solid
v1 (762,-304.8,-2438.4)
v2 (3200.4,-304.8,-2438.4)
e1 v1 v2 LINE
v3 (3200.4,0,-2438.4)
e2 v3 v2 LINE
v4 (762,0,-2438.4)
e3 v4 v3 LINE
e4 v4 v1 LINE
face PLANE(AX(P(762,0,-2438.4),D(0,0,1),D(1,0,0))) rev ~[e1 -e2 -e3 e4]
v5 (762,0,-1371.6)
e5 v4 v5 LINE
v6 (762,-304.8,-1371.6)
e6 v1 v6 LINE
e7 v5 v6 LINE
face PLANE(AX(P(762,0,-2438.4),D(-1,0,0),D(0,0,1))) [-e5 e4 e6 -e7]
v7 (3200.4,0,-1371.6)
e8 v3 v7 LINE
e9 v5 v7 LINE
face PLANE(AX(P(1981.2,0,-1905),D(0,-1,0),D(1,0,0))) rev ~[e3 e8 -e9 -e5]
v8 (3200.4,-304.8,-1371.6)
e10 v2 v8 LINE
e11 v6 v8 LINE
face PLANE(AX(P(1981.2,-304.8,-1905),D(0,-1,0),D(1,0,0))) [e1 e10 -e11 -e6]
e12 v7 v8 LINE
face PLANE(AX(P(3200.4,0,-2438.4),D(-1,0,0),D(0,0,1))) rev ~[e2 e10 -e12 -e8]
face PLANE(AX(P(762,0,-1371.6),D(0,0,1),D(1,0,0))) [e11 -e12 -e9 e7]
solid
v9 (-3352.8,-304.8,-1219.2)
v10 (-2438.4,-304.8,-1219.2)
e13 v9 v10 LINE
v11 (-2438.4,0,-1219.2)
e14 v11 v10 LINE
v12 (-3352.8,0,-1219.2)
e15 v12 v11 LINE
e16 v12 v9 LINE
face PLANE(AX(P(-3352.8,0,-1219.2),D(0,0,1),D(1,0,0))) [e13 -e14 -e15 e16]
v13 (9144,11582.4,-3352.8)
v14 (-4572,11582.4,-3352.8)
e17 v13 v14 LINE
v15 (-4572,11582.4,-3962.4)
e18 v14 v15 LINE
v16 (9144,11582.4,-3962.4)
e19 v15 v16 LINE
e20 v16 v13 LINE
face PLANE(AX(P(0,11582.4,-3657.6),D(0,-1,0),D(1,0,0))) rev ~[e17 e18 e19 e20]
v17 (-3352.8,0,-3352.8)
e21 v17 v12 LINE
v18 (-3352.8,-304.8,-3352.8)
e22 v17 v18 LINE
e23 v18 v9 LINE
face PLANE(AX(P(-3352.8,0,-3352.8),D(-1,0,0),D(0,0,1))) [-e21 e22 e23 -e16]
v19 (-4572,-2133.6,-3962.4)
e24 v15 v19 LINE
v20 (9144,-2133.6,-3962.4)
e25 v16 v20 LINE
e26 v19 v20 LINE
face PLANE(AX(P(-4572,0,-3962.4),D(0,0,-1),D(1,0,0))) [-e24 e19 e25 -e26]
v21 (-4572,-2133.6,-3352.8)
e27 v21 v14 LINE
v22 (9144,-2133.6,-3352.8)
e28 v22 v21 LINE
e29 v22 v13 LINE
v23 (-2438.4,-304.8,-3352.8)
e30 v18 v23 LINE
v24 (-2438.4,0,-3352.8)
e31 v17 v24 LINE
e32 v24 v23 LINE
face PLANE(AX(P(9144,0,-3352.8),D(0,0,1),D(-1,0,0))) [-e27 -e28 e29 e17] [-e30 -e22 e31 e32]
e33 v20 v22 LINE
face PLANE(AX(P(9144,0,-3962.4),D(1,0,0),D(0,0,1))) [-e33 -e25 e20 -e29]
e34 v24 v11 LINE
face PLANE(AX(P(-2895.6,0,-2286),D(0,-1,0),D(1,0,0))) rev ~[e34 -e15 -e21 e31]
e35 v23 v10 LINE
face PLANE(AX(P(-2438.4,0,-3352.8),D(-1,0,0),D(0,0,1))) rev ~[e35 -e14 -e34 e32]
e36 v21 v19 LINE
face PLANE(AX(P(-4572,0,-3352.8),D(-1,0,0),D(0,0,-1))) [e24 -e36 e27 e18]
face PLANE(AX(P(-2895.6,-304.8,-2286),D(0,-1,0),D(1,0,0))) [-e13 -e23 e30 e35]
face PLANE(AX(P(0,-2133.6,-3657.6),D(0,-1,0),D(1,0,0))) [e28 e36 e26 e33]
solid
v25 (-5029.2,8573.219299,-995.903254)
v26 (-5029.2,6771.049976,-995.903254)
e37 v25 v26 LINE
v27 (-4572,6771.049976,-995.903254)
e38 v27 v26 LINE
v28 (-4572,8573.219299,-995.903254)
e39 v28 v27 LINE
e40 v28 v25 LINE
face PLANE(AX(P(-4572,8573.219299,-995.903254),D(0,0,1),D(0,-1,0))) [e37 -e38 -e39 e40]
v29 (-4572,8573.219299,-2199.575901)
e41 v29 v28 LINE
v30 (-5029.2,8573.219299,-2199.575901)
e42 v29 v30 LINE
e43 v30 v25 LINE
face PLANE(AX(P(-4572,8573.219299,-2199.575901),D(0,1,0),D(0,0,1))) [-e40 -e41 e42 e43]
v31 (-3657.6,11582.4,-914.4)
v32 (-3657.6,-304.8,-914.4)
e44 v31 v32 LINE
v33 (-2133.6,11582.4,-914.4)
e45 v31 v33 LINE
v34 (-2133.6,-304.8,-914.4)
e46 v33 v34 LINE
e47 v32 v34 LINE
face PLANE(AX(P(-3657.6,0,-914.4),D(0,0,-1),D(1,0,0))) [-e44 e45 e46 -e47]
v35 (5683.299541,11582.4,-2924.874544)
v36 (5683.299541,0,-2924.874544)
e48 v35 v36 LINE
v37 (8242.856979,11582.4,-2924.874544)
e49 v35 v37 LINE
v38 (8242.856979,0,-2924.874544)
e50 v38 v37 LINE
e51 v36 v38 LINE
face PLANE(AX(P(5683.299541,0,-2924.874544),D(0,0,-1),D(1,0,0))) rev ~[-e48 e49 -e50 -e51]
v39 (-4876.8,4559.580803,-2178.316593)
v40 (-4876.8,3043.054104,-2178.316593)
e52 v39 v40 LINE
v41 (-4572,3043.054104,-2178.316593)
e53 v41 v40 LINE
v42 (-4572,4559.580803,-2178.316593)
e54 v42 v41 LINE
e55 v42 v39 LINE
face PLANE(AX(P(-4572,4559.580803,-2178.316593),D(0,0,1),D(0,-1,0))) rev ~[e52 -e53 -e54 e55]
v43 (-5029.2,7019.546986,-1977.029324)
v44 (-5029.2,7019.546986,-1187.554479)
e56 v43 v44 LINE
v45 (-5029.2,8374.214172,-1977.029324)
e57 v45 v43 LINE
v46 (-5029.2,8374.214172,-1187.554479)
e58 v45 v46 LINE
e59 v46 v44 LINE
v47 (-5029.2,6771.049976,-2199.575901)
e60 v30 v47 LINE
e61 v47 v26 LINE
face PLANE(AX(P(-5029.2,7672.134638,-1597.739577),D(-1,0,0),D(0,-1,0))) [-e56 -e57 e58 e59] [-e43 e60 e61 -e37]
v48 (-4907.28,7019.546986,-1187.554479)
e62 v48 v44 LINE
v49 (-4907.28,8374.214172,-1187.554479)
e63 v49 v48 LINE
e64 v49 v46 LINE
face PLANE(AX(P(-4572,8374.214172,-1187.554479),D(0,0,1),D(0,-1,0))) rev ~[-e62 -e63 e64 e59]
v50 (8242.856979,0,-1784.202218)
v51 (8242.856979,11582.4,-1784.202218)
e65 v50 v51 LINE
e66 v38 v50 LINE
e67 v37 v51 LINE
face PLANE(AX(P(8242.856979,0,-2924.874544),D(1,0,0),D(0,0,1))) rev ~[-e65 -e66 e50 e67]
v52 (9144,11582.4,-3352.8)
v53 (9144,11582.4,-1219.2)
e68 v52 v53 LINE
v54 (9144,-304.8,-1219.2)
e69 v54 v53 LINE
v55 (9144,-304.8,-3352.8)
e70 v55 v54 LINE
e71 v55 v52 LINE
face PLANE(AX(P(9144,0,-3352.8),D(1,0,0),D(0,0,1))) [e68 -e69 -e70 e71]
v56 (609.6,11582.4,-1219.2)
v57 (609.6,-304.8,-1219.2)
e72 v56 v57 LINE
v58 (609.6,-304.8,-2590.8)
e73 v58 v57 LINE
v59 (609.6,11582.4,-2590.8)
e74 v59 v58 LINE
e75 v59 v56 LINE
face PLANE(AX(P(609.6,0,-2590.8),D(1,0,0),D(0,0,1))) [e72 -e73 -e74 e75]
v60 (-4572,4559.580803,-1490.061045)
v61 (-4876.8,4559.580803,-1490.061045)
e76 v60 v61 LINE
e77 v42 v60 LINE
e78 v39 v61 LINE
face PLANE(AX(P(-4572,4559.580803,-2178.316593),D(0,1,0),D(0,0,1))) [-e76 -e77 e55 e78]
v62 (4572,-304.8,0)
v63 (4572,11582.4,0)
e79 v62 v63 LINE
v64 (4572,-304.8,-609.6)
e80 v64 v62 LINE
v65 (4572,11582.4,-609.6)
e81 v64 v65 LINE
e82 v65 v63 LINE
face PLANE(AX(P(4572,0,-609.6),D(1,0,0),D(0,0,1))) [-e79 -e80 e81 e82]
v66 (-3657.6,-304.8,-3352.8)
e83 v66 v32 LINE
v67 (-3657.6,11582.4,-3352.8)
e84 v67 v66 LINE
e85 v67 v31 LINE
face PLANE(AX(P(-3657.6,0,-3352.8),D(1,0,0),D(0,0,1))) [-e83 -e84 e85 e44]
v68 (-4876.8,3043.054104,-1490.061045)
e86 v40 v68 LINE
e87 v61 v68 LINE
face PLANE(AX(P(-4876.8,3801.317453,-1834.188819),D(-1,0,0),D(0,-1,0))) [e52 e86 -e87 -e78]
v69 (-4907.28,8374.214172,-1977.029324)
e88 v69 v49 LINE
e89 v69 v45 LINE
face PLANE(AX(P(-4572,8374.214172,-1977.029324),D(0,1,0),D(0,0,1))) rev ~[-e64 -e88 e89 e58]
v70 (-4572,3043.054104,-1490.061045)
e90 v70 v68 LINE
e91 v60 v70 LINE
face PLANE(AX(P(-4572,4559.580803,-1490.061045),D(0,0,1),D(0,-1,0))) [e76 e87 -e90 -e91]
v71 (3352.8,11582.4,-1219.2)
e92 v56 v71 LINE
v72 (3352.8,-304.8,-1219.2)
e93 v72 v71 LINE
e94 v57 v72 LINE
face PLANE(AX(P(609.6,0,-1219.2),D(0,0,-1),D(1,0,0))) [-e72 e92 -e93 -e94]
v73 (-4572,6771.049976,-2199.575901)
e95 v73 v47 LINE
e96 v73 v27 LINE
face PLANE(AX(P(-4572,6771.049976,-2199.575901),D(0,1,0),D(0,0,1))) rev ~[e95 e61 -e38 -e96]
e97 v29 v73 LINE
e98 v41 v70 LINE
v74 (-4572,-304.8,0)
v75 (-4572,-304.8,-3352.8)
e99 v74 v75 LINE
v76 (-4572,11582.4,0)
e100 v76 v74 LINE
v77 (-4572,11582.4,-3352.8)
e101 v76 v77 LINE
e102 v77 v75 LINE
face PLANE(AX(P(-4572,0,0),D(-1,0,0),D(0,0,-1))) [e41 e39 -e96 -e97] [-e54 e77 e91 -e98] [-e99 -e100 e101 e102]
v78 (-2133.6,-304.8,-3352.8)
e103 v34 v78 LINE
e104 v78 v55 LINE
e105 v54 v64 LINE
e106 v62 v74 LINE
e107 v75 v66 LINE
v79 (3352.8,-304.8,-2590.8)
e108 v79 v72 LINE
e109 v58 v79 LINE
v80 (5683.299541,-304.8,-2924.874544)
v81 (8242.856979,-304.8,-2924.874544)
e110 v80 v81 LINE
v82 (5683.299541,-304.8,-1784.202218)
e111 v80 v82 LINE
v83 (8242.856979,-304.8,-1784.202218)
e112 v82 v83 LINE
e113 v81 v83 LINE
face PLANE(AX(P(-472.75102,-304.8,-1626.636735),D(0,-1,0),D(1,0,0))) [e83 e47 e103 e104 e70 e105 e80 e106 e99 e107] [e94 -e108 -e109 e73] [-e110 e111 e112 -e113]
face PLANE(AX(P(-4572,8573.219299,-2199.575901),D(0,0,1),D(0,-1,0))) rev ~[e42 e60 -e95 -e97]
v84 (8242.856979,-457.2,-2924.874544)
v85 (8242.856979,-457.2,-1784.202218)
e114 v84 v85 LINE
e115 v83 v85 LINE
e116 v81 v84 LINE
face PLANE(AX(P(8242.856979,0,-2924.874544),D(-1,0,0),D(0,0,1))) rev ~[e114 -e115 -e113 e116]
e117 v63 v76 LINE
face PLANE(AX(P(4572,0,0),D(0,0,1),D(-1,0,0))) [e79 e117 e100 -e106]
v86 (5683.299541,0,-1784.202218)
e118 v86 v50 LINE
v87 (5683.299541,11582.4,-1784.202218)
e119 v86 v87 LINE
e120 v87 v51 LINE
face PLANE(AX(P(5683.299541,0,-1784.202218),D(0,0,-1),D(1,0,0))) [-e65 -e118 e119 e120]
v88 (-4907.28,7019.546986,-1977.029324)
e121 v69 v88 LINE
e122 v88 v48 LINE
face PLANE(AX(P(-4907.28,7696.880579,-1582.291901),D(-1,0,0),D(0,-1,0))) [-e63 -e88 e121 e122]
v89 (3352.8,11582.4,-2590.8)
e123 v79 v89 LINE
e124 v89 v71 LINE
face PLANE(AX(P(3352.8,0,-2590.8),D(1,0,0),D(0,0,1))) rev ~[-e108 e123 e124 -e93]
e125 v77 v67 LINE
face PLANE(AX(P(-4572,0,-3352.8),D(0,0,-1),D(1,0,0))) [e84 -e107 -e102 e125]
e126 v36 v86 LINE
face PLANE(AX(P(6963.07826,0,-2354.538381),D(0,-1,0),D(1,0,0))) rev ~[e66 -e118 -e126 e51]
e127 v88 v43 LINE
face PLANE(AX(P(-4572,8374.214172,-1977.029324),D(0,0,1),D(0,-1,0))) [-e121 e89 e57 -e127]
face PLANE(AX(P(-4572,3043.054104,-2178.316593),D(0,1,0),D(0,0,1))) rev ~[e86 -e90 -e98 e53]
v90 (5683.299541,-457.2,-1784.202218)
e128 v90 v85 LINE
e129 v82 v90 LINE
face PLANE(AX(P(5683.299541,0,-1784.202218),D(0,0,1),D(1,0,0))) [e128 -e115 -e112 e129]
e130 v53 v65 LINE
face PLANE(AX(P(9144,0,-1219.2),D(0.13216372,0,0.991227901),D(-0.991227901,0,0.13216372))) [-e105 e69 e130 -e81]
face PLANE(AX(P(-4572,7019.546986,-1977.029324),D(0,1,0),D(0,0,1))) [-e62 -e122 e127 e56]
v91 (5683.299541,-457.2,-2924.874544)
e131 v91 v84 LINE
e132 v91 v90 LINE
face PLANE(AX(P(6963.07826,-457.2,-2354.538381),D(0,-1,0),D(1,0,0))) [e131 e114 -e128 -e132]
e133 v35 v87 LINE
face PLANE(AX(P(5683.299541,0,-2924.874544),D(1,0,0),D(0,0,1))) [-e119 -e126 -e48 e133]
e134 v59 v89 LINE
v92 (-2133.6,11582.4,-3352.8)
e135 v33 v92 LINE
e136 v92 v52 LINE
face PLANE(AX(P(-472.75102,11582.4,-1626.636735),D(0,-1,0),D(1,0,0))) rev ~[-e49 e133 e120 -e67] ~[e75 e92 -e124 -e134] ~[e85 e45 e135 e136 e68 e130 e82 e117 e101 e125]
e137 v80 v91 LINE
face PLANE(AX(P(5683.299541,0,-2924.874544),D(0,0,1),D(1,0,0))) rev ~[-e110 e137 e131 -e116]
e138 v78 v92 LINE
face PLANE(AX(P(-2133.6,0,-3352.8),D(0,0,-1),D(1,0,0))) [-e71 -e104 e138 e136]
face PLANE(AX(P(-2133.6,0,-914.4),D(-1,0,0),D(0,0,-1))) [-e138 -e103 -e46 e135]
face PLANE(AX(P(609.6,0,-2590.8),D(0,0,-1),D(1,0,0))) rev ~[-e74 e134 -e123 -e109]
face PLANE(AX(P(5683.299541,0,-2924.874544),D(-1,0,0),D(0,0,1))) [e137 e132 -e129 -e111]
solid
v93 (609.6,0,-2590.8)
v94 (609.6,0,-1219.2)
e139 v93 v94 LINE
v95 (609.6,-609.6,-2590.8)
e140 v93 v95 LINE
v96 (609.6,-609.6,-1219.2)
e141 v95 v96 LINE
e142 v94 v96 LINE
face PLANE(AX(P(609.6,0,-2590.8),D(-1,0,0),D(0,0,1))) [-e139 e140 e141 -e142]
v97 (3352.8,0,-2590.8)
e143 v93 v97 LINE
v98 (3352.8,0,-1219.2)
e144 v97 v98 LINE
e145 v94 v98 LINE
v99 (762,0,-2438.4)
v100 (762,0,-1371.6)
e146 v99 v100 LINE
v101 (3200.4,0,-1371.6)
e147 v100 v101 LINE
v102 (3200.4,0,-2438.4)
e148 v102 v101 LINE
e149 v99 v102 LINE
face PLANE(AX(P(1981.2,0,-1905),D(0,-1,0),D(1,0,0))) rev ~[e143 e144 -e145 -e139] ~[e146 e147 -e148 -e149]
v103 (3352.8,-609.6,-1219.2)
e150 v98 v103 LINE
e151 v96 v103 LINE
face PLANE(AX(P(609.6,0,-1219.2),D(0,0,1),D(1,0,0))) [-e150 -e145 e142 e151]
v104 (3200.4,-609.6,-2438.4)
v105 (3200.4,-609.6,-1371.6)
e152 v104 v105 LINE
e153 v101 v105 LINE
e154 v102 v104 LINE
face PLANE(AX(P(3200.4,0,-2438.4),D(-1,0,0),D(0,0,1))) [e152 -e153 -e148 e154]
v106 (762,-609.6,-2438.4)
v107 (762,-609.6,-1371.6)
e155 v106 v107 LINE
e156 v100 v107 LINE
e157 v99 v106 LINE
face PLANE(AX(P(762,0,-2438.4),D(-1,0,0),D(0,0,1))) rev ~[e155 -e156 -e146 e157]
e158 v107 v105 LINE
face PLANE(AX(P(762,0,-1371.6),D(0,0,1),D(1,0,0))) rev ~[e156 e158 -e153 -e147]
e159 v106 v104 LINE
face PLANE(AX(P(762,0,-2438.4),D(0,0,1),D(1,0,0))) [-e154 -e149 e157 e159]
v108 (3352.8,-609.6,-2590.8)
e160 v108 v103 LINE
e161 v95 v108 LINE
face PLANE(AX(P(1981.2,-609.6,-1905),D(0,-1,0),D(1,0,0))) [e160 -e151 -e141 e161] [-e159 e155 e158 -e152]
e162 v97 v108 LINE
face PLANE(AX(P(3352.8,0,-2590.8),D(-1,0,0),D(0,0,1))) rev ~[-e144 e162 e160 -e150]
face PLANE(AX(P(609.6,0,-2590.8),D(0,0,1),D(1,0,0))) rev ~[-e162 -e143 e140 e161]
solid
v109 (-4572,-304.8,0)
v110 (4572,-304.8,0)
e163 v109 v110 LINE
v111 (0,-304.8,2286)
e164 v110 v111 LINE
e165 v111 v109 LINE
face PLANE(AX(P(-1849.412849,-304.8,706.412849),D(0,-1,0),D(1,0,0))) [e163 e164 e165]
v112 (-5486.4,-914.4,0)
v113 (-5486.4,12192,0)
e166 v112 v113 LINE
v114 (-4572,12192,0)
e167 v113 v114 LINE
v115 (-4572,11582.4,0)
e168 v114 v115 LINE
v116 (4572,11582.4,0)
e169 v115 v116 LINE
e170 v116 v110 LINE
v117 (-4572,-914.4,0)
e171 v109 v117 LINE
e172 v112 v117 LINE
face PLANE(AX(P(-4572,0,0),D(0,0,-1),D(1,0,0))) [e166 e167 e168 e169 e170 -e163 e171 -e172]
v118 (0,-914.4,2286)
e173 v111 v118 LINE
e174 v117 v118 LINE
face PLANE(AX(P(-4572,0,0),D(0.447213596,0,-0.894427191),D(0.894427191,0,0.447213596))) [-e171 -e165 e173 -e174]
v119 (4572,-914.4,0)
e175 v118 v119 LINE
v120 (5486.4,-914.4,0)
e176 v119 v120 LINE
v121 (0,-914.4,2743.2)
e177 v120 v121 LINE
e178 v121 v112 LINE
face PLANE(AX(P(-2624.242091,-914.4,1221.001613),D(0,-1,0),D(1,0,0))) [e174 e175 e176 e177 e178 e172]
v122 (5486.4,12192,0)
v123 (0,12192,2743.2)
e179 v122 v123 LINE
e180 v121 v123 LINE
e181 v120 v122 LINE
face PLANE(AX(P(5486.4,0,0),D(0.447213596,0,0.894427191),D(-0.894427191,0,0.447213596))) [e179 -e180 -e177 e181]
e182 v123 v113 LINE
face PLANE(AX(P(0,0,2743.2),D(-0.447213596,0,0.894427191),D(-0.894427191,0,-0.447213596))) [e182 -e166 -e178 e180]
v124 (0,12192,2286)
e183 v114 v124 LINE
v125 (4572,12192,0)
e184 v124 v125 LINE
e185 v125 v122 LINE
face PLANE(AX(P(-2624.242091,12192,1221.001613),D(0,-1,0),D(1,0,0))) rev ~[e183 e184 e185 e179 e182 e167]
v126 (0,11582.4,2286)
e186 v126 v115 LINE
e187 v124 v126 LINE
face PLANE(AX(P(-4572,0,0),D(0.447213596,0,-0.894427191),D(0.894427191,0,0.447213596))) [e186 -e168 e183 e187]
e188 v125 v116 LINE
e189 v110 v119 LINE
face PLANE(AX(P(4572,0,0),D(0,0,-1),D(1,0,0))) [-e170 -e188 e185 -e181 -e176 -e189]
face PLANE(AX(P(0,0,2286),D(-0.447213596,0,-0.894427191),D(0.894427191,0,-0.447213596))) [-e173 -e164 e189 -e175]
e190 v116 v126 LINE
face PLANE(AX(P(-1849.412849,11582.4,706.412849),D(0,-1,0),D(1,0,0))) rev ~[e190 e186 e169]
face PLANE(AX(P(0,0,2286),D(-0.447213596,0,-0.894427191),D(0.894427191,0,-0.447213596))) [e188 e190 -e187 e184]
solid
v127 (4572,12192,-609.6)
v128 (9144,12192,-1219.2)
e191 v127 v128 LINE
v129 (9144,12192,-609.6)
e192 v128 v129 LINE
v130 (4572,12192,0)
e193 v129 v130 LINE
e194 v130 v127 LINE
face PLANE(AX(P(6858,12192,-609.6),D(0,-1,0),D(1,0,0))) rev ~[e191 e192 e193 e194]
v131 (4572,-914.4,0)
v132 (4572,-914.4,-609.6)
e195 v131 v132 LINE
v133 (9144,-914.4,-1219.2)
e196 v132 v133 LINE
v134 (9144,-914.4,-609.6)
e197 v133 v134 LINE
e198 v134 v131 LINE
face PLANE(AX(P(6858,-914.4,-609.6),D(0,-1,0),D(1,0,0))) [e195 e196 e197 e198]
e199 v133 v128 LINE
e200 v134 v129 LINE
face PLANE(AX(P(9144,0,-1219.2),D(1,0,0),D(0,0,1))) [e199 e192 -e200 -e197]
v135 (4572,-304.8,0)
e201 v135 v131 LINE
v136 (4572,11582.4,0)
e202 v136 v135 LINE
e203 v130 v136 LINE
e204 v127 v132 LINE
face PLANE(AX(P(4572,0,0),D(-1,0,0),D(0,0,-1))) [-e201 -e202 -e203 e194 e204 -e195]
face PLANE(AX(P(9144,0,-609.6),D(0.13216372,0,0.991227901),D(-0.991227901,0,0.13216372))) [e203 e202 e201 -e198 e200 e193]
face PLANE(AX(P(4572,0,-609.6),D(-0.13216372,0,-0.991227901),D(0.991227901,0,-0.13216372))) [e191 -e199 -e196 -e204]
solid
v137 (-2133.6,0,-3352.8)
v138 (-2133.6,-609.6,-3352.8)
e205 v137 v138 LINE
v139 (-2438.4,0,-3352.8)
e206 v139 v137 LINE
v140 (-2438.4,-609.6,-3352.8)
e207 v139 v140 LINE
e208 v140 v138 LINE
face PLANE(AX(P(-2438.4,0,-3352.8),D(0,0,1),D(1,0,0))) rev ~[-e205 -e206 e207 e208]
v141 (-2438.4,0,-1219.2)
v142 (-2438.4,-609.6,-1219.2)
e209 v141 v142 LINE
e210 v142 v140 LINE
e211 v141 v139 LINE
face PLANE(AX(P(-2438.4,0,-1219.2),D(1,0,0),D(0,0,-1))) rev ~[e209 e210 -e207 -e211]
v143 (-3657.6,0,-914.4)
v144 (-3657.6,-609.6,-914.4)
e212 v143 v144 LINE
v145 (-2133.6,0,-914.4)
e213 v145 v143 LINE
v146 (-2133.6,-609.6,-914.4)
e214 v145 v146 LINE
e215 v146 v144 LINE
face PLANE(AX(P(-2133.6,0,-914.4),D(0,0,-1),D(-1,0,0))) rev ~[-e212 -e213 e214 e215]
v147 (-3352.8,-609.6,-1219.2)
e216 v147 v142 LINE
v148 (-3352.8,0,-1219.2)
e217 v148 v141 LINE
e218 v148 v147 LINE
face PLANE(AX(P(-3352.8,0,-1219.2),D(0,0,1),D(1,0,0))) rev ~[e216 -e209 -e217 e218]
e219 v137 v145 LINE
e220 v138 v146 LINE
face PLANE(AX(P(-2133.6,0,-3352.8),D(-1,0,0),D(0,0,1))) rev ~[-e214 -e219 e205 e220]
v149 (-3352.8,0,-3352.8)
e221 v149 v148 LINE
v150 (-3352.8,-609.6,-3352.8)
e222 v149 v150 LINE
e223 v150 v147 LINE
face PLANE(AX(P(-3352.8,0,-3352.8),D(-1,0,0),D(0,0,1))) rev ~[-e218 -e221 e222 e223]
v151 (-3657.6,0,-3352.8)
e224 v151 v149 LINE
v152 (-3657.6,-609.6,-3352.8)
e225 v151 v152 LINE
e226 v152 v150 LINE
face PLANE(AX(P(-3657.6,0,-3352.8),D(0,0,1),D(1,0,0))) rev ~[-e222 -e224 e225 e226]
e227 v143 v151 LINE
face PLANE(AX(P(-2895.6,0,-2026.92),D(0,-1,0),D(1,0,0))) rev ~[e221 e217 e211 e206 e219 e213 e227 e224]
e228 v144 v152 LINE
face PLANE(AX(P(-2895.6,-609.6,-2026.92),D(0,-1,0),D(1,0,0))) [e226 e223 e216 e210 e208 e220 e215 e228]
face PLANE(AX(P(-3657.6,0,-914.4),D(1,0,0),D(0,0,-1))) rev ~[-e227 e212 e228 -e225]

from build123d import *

# Parameters (mm, degrees)
F1_DEPTH      = 914.4
F1_DEPTH_BACK = 12192
F2_DEPTH      = 304.8
F2_DEPTH_BACK = 11582.4
F0_W          = 4572
F0_H          = 609.6
F3_DEPTH      = 2133.6
F3_DEPTH_BACK = 11582.4
F0_W_2        = 2743.2
F0_H_2        = 1371.6
F0_W_3        = 2559.5574378967
F0_H_3        = 1140.672326088
F4_DEPTH      = 304.8
F4_DEPTH_BACK = 11582.4
F0_W_4        = 914.4
F0_H_4        = 2133.6
F5_DEPTH      = 304.8
F0_W_5        = 2438.4
F0_H_5        = 1066.8
F6_DEPTH      = 609.6
F7_W          = 1354.6671867371
F7_H          = 789.4748449326
F8_DEPTH      = 30.48
F7_W_2        = 1802.1693229675
F7_H_2        = 1203.6726474762
F9_DEPTH      = 457.2
F10_DEPTH     = 304.8
F7_W_3        = 1516.5266990662
F7_H_3        = 688.2555484772
F11_DEPTH     = 304.8
F0_W_6        = 1864.025592804
F0_H_6        = 417.3192977905
F13_DEPTH     = 457.2


# Not quite as in the source:
# - the program builds the solid bodies; features that only make, move or delete a surface that nothing else refers to are left out


with BuildPart() as f1:
    # F0 (on Front) → F1 (new body, two sides)
    with BuildSketch(Plane.XZ) as f1_sk:
        Polygon((-5486.4, 0), (-4572, 0), (0, 2286), (0, 2743.2), align=None)
        Polygon((0, 2286), (4572, 0), (5486.4, 0), (0, 2743.2), align=None)
    extrude(amount=F1_DEPTH)
    extrude(f1_sk.sketch, amount=-F1_DEPTH_BACK)



with BuildPart() as f1b:
    # F0 (on Front) → F1, piece 2 (new body, two sides)
    with BuildSketch(Plane.XZ) as f1_2_sk:
        Polygon((9144, -609.6), (4572, 0), (4572, -609.6), (9144, -1219.2), align=None)
    extrude(amount=F1_DEPTH)
    extrude(f1_2_sk.sketch, amount=-F1_DEPTH_BACK)


with BuildPart() as f1_1:
    add(f1.part)

    add(f1b.part)  # F2 merges F1b
    # F0 (on Front) → F2 (join, two sides)
    with BuildSketch(Plane.XZ) as f2_sk:
        Polygon((-4572, 0), (0, 0), (0, 2286), align=None)
        Polygon((0, 2286), (0, 0), (4572, 0), align=None)
    extrude(amount=F2_DEPTH)
    extrude(f2_sk.sketch, amount=-F2_DEPTH_BACK)


with BuildPart() as f3:
    # F0 (on Front) → F3 (new body, two sides)
    with BuildSketch(Plane.XZ) as f3_sk:
        Polygon((-3657.6, -3352.8), (-4572, -3352.8), (-4572, -3962.4), (4572, -3962.4), (4572, -3352.8), (-2133.6, -3352.8), (-2438.4, -3352.8), (-3352.8, -3352.8), align=None)
        with Locations((6858, -3657.6)):
            Rectangle(F0_W, F0_H)
    extrude(amount=F3_DEPTH)
    extrude(f3_sk.sketch, amount=-F3_DEPTH_BACK)

    # F0 (on Front) → F5 (join)
    with BuildSketch(Plane.XZ):
        with Locations((-2895.6, -2286)):
            Rectangle(F0_W_4, F0_H_4)
    extrude(amount=F5_DEPTH)


with BuildPart() as f4:
    # F0 (on Front) → F4 (new body, two sides)
    with BuildSketch(Plane.XZ) as f4_sk:
        Polygon((4572, 0), (0, 0), (-4572, 0), (-4572, -3352.8), (-3657.6, -3352.8), (-3657.6, -914.4), (-2133.6, -914.4), (-2133.6, -3352.8), (4572, -3352.8), (4572, -609.6), align=None)
        with Locations((1981.2, -1905)):
            Rectangle(F0_W_2, F0_H_2, mode=Mode.SUBTRACT)
        Polygon((9144, -1219.2), (4572, -609.6), (4572, -3352.8), (9144, -3352.8), align=None)
        with Locations((6963.0782604218, -2354.5383810997)):
            Rectangle(F0_W_3, F0_H_3, mode=Mode.SUBTRACT)
    extrude(amount=F4_DEPTH)
    extrude(f4_sk.sketch, amount=-F4_DEPTH_BACK)

    # F7 (on face) → F8 (join)
    with BuildSketch(Plane(origin=(-4572, 0, 0), x_dir=(0, -1, 0), z_dir=(-1, 0, 0))):
        with Locations((-7696.8805789948, -1582.2919011116)):
            Rectangle(F7_W, F7_H)
    extrude(amount=F8_DEPTH)

    # F7 (on face) → F9 (join)
    with BuildSketch(Plane(origin=(-4572, 0, 0), x_dir=(0, -1, 0), z_dir=(-1, 0, 0))):
        with Locations((-7672.1346378326, -1597.7395772934)):
            Rectangle(F7_W_2, F7_H_2)
        with Locations((-7696.8805789948, -1582.2919011116)):
            Rectangle(F7_W, F7_H, mode=Mode.SUBTRACT)
    extrude(amount=F9_DEPTH)

    # F10 (add): a face of the model
    f10_faces = [f4.faces().sort_by_distance(p)[0] for p in [
        (-4602.48, 7696.8805789948, -1582.2919011116),
    ]]
    extrude(f10_faces, amount=F10_DEPTH)

    # F7 (on face) → F11 (join)
    with BuildSketch(Plane(origin=(-4572, 0, 0), x_dir=(0, -1, 0), z_dir=(-1, 0, 0))):
        with Locations((-3801.3174533844, -1834.1888189316)):
            Rectangle(F7_W_3, F7_H_3)
    extrude(amount=F11_DEPTH)

    # F0 (on Front) → F13 (join)
    with BuildSketch(Plane.XZ):
        with Locations((6963.0782604218, -2354.5383810997)):
            Rectangle(F0_W_3, F0_H_3)
        with Locations((6976.9885540009, -2382.3595046997)):
            Rectangle(F0_W_6, F0_H_6, mode=Mode.SUBTRACT)
        with Locations((6976.9885540009, -2382.3595046997)):
            Rectangle(F0_W_6, F0_H_6)
    extrude(amount=F13_DEPTH)


with BuildPart() as f5:
    # F0 (on Front) → F5, piece 2 (new body)
    with BuildSketch(Plane.XZ):
        with Locations((1981.2, -1905)):
            Rectangle(F0_W_5, F0_H_5)
    extrude(amount=F5_DEPTH)


with BuildPart() as f6:
    # F0 (on Front) → F6 (new body)
    with BuildSketch(Plane.XZ):
        with Locations((1981.2, -1905)):
            Rectangle(F0_W_2, F0_H_2)
        with Locations((1981.2, -1905)):
            Rectangle(F0_W_5, F0_H_5, mode=Mode.SUBTRACT)
    extrude(amount=F6_DEPTH)


with BuildPart() as f6b:
    # F0 (on Front) → F6, piece 2 (new body)
    with BuildSketch(Plane.XZ):
        Polygon((-3657.6, -914.4), (-3657.6, -3352.8), (-3352.8, -3352.8), (-3352.8, -1219.2), (-2438.4, -1219.2), (-2438.4, -3352.8), (-2133.6, -3352.8), (-2133.6, -914.4), align=None)
    extrude(amount=F6_DEPTH)


solid = Compound([f1_1.part, f3.part, f4.part, f5.part, f6.part, f6b.part])
